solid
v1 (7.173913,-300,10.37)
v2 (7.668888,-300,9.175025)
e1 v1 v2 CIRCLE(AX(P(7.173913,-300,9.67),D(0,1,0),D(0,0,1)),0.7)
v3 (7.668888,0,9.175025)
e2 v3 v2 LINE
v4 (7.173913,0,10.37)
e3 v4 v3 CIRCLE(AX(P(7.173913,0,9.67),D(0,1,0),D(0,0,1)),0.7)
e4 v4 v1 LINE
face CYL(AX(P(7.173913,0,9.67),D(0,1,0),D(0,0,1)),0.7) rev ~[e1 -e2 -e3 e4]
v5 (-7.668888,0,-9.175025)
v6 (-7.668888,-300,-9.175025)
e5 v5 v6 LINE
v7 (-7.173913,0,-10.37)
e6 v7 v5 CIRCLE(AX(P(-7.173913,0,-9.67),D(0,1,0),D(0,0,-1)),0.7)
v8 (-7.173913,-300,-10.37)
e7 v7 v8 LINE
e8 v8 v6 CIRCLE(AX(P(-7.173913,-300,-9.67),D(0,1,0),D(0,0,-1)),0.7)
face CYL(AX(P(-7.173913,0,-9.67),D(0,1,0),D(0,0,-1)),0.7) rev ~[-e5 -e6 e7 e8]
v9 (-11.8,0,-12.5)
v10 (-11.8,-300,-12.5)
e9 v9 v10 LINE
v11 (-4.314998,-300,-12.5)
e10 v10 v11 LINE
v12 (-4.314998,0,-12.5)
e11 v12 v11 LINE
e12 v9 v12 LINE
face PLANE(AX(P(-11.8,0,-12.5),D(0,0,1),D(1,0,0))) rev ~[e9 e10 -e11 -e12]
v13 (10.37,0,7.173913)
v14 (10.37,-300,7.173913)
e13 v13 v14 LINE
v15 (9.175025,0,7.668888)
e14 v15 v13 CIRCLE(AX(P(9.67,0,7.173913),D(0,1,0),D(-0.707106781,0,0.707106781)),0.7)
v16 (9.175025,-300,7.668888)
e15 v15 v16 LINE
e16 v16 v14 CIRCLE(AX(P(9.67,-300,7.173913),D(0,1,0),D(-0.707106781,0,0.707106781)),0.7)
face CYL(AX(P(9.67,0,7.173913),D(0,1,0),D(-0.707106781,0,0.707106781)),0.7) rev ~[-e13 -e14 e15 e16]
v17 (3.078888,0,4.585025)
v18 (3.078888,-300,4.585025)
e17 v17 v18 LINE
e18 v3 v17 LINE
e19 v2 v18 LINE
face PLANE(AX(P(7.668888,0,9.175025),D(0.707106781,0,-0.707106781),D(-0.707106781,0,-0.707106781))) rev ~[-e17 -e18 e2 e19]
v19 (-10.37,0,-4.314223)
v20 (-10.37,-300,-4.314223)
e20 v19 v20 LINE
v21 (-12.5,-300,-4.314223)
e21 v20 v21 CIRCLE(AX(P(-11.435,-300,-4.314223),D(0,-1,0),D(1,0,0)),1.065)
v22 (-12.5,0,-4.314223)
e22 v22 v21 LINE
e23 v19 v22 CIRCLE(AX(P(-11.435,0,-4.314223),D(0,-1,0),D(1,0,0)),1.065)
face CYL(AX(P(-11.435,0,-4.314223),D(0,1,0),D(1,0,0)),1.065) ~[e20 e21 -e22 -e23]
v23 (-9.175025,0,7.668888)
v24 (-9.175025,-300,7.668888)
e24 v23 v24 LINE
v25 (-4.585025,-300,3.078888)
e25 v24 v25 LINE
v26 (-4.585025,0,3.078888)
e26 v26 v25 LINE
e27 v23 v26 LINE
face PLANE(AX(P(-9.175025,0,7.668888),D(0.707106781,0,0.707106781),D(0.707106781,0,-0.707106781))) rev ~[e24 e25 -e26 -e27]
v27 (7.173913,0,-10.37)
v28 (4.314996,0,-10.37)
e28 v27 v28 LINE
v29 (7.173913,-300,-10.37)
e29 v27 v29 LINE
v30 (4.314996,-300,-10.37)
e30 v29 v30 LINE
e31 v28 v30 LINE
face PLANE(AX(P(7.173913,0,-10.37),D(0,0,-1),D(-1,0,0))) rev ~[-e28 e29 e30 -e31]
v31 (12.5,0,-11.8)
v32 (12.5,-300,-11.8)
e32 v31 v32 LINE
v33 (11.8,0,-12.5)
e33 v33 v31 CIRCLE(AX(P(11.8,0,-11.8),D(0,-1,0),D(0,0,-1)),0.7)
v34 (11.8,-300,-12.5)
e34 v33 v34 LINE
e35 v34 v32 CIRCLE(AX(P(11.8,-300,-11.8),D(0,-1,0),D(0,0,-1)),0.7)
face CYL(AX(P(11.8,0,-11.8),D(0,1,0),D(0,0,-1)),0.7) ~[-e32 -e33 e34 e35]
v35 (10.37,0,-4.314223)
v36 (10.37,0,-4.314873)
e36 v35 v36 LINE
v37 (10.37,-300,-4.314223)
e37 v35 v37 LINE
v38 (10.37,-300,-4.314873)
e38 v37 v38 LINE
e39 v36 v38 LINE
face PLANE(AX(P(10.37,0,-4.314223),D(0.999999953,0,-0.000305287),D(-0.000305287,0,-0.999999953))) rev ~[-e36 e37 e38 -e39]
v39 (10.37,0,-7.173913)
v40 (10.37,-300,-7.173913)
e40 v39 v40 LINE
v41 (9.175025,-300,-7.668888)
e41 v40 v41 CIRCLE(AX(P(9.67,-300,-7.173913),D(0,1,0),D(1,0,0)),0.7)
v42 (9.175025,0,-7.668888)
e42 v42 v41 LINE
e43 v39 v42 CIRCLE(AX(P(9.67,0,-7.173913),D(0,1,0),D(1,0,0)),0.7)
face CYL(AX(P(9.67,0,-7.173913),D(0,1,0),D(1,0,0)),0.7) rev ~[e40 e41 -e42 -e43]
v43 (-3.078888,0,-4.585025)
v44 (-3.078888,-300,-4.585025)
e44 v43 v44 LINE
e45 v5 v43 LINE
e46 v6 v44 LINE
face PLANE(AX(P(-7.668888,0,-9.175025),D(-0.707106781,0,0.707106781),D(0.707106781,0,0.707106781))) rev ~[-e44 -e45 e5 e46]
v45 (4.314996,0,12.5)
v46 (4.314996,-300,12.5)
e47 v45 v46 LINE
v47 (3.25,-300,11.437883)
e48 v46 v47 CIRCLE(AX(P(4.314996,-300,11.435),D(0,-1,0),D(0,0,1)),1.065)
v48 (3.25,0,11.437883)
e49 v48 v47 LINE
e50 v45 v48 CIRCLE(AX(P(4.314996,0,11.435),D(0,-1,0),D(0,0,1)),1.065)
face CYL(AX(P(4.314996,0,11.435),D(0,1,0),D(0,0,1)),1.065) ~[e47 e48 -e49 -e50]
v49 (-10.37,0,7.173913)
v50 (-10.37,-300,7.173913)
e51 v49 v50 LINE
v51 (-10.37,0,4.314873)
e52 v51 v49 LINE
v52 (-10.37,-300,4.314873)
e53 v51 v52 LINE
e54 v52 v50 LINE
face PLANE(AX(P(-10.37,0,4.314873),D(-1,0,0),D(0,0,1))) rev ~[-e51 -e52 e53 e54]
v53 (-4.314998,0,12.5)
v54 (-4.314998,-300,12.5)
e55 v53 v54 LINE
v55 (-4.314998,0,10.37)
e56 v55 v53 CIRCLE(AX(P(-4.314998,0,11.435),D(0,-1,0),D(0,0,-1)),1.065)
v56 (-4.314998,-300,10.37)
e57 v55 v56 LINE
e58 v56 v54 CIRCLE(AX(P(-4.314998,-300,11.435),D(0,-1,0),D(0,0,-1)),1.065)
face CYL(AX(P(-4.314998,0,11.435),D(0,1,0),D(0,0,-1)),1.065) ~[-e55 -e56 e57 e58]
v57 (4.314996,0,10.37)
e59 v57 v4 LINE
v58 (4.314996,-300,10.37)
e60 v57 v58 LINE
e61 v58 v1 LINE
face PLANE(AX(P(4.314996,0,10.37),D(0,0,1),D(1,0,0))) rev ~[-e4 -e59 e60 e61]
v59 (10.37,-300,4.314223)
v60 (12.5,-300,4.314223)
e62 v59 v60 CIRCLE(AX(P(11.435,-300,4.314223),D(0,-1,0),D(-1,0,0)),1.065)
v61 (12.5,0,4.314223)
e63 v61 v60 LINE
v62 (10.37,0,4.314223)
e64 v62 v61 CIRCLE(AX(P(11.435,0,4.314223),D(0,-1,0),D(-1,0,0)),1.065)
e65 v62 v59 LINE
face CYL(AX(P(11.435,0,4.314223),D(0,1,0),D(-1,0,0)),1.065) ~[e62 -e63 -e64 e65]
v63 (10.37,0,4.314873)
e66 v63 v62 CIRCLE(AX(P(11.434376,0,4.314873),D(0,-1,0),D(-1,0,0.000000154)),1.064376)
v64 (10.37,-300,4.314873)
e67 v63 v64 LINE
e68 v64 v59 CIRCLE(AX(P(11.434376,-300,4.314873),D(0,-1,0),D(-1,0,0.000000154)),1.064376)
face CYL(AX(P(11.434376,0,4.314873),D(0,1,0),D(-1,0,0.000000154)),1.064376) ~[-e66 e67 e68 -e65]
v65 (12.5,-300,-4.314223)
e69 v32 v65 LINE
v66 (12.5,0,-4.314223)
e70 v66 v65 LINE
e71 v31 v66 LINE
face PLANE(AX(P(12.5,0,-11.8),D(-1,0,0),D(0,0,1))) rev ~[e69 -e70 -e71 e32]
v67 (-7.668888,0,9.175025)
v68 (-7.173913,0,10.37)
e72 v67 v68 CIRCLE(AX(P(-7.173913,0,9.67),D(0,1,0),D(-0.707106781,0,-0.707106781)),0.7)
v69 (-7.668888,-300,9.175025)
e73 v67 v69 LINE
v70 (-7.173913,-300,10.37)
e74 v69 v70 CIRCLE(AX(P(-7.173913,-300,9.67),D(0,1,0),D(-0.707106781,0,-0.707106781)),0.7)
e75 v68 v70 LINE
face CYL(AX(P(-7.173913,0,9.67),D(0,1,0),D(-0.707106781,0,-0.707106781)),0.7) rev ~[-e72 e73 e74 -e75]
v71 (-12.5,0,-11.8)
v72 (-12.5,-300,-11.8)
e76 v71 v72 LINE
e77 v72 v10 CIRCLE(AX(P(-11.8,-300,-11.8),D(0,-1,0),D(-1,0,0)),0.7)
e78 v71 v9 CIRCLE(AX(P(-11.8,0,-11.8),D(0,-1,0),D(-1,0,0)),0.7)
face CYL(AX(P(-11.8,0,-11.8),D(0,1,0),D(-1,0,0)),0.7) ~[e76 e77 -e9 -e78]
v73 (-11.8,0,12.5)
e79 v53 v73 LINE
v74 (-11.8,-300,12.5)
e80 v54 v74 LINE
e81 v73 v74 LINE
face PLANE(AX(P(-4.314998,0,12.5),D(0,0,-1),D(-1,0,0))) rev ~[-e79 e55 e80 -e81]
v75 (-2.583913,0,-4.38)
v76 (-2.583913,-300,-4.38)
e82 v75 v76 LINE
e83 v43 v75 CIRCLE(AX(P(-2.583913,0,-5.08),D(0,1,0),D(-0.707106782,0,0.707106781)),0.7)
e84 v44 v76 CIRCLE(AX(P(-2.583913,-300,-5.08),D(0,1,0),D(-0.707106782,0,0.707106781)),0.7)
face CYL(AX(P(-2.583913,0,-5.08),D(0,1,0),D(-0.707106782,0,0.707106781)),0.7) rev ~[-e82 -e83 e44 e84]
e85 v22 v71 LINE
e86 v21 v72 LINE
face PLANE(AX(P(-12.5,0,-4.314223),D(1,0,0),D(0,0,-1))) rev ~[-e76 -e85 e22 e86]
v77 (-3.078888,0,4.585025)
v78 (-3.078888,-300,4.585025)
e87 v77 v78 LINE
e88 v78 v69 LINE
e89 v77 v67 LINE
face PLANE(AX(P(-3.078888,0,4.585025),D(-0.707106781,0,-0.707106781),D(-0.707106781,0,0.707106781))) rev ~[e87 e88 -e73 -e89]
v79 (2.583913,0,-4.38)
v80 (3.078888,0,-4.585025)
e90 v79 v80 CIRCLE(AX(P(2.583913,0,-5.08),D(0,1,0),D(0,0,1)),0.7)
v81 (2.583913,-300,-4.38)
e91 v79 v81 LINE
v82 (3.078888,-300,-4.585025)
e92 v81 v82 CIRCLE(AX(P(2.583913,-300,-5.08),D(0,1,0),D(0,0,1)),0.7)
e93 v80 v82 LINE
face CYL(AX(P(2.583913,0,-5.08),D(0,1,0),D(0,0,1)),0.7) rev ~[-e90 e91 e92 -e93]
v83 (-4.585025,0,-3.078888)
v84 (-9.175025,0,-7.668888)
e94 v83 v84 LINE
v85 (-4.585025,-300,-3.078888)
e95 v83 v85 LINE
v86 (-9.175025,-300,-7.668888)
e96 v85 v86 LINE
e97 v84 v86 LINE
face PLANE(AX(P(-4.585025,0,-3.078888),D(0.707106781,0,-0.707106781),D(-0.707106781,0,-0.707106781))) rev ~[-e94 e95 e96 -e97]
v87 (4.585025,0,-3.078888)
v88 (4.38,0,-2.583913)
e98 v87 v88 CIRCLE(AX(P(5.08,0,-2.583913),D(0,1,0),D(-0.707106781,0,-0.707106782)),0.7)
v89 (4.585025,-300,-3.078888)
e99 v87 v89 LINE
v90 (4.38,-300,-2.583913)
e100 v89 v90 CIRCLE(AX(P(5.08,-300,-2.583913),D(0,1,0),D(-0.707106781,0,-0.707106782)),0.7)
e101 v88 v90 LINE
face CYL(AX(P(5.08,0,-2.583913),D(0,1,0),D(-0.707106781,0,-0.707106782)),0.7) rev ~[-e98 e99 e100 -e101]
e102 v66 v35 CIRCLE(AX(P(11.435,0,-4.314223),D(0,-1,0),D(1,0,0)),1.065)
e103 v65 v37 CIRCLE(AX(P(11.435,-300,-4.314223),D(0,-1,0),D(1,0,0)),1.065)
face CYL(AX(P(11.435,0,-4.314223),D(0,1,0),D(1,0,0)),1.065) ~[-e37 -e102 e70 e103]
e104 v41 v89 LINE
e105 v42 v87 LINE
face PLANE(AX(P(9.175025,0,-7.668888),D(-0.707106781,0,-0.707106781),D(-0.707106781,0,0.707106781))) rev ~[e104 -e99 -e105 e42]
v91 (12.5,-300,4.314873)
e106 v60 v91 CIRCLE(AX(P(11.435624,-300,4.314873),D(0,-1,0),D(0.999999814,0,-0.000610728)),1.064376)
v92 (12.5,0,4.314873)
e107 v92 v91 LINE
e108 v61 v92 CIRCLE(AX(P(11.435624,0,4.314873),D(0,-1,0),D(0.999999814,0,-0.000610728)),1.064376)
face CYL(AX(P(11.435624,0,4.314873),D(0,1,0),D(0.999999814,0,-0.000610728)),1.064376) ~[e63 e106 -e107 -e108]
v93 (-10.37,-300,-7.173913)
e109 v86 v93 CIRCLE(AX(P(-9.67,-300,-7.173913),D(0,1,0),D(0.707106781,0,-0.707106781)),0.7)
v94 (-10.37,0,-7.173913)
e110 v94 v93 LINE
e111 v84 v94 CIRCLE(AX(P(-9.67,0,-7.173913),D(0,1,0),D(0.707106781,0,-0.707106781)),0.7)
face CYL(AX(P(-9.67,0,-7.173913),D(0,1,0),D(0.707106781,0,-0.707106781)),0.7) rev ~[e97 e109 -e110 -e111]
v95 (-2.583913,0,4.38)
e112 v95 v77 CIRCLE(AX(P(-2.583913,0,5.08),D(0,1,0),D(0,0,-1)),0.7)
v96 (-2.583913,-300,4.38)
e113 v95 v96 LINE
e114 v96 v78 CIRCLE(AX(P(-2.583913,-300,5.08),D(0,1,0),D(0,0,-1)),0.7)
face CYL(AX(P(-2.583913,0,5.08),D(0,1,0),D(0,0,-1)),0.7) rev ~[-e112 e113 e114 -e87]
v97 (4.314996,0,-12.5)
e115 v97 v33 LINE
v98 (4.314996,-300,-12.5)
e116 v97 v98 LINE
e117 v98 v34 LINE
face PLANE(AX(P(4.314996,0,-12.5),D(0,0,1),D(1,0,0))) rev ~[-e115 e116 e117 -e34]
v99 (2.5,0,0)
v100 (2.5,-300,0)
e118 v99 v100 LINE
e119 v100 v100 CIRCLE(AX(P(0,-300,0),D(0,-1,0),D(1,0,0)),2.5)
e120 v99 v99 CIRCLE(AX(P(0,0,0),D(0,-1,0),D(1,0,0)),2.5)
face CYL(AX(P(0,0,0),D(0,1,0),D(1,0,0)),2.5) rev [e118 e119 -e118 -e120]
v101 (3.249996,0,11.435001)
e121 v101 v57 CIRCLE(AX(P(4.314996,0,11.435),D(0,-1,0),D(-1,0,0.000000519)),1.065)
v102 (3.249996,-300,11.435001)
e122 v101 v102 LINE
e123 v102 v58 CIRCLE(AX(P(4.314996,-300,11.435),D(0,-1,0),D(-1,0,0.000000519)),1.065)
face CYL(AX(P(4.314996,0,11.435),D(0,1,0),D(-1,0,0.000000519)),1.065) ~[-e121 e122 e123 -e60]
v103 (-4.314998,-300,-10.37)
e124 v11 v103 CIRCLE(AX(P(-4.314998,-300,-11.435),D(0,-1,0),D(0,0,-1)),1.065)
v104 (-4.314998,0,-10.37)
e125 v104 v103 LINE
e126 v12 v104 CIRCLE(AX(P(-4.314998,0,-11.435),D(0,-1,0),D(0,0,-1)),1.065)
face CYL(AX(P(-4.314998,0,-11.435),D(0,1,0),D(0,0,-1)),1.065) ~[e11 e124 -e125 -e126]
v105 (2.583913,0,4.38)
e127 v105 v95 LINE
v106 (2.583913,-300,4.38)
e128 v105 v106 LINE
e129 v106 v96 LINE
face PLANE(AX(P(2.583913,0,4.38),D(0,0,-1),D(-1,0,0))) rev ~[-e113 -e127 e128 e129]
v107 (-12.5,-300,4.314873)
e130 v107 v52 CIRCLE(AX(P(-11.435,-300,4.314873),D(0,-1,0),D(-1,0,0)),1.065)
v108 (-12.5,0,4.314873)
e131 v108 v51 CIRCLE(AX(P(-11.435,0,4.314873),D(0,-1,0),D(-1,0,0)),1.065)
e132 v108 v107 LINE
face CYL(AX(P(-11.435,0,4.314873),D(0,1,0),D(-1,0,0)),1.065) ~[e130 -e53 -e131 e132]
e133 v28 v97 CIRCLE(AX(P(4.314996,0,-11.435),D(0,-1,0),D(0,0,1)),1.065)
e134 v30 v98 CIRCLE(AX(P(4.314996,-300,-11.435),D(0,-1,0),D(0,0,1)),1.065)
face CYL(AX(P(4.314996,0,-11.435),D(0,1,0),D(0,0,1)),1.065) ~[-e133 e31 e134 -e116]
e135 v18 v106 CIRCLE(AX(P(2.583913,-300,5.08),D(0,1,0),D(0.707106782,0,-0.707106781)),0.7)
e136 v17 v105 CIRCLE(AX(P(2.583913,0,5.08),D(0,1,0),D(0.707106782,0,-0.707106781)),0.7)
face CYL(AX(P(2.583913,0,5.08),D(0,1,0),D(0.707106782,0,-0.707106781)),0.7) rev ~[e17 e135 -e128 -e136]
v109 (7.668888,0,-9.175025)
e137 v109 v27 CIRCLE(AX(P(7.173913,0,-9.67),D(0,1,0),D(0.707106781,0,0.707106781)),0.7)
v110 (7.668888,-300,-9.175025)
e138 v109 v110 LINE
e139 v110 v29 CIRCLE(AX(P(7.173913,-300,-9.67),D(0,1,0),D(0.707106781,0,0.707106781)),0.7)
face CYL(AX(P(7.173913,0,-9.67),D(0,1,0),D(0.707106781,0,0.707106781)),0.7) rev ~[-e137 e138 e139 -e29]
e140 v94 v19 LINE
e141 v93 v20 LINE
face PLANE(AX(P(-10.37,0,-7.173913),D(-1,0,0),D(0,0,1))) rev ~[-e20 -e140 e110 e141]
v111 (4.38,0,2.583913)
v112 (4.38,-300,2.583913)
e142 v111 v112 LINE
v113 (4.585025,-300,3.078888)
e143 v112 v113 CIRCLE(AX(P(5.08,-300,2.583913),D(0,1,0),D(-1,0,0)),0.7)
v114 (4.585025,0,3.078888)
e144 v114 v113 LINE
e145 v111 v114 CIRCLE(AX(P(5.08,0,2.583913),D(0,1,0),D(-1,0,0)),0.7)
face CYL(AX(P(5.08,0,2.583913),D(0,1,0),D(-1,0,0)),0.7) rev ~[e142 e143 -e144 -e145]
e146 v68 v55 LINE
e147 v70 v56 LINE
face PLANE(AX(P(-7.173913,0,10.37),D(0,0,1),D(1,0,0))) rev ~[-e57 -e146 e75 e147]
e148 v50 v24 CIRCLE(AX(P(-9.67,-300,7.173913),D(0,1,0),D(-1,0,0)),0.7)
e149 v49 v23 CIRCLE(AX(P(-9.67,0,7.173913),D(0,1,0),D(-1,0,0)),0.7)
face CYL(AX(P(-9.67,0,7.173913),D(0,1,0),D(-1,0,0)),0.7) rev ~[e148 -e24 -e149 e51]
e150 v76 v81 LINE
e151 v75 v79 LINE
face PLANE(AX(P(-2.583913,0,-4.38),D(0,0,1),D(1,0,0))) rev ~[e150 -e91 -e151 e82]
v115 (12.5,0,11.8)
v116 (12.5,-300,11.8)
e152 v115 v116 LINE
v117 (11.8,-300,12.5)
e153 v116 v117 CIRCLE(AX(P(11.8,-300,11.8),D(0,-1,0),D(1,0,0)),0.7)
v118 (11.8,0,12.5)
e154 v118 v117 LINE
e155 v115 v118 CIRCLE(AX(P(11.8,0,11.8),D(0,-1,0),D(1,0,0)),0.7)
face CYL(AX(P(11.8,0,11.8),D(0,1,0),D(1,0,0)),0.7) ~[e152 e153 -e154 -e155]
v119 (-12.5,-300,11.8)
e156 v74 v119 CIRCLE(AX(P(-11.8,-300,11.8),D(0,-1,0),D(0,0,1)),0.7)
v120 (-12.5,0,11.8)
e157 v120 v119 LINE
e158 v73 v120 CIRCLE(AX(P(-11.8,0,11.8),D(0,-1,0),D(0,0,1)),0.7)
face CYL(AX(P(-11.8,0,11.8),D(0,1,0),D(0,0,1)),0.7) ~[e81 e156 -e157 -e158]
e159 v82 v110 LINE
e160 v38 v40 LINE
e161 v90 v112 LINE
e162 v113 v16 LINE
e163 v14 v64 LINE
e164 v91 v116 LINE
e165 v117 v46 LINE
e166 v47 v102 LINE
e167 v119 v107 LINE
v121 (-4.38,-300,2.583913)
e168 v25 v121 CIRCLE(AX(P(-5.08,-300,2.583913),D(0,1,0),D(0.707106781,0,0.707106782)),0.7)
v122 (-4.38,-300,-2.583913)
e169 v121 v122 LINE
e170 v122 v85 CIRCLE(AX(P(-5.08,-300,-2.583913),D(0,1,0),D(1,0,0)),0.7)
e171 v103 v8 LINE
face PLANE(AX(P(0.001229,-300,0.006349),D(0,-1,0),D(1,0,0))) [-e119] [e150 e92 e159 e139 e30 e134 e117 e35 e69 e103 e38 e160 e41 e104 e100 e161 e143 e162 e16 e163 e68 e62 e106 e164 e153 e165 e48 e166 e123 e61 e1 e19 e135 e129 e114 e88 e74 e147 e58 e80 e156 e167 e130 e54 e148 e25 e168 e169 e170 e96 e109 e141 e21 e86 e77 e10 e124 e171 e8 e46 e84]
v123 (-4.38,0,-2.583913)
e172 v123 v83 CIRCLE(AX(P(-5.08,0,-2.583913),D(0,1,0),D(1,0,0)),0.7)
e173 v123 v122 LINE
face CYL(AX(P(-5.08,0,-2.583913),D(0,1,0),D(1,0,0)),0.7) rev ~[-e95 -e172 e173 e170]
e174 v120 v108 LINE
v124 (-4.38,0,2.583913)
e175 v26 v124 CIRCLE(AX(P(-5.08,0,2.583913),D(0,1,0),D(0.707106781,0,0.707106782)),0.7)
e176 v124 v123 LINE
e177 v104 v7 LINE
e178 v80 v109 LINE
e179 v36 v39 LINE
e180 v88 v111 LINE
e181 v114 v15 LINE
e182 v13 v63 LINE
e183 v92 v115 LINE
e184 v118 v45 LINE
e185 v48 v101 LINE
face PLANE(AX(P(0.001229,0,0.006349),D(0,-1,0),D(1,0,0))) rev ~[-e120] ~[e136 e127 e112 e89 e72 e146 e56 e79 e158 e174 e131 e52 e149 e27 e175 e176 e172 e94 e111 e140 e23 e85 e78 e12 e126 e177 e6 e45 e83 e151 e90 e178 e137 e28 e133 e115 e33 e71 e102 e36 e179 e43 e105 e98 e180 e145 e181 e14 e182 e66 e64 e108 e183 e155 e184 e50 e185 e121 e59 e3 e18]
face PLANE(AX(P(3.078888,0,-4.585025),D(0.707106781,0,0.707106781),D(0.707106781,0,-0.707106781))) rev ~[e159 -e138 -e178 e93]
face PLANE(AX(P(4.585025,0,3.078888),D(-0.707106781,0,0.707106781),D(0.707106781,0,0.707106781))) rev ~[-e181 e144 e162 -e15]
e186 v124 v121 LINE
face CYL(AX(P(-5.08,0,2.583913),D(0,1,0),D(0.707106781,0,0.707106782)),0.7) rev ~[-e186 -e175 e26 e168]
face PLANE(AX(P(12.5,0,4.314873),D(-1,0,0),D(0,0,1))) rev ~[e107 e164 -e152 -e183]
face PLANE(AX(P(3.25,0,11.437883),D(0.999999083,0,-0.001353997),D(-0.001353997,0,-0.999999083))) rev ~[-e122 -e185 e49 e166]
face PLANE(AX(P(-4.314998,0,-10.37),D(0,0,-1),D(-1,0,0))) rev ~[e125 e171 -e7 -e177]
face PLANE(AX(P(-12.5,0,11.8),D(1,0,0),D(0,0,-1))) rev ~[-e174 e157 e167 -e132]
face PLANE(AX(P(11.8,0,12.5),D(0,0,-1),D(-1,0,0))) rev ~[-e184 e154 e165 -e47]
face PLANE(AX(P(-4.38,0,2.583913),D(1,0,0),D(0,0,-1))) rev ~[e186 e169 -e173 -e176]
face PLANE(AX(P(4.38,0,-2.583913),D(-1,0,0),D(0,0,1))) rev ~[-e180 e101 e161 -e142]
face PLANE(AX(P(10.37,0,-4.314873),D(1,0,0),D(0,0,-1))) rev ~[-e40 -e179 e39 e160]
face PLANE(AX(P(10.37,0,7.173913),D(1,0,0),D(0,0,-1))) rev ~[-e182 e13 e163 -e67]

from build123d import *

# Parameters (mm, degrees)
F0_R     = 2.5
F1_DEPTH = 300


# Not quite as in the source:
# - ends of sketch curves that miss each other by under 0.0002 mm in the source are joined


with BuildPart() as f1:
    # F0 (on Front) → F1 (new body)
    with BuildSketch(Plane.XZ):
        with BuildLine():
            ThreePointArc((12.5, 11.8), (12.2949747468, 12.2949747468), (11.8, 12.5))
            Line((11.8, 12.5), (4.3149960966, 12.5))
            ThreePointArc((4.3149960966, 12.5), (3.5629475094, 12.1890874766), (3.25, 11.4378834224))
            Line((3.25, 11.4378834224), (3.2499960966, 11.4350005532))
            ThreePointArc((3.2499960966, 11.4350005532), (3.5619271791, 10.6819314736), (4.3149960966, 10.37))
            Line((4.3149960966, 10.37), (7.1739130624, 10.37))
            ThreePointArc((7.1739130624, 10.37), (7.8206287352, 9.9378784027), (7.6688878092, 9.1750252532))
            Line((7.6688878092, 9.1750252532), (3.0788878092, 4.5850252532))
            ThreePointArc((3.0788878092, 4.5850252532), (2.8517914651, 4.4332843272), (2.5839130624, 4.38))
            Line((2.5839130624, 4.38), (-2.5839130624, 4.38))
            ThreePointArc((-2.5839130624, 4.38), (-2.8517914651, 4.4332843272), (-3.0788878092, 4.5850252532))
            Line((-3.0788878092, 4.5850252532), (-7.6688878092, 9.1750252532))
            ThreePointArc((-7.6688878092, 9.1750252532), (-7.8206287352, 9.9378784027), (-7.1739130624, 10.37))
            Line((-7.1739130624, 10.37), (-4.3149983424, 10.37))
            ThreePointArc((-4.3149983424, 10.37), (-3.2499983424, 11.435), (-4.3149983424, 12.5))
            Line((-4.3149983424, 12.5), (-11.8, 12.5))
            ThreePointArc((-11.8, 12.5), (-12.2949747468, 12.2949747468), (-12.5, 11.8))
            Line((-12.5, 11.8), (-12.5, 4.3148727296))
            ThreePointArc((-12.5, 4.3148727296), (-11.435, 3.2498727296), (-10.37, 4.3148727296))
            Line((-10.37, 4.3148727296), (-10.37, 7.1739130624))
            ThreePointArc((-10.37, 7.1739130624), (-9.9378784027, 7.8206287352), (-9.1750252532, 7.6688878092))
            Line((-9.1750252532, 7.6688878092), (-4.5850252532, 3.0788878092))
            ThreePointArc((-4.5850252532, 3.0788878092), (-4.4332843272, 2.8517914651), (-4.38, 2.5839130624))
            Line((-4.38, 2.5839130624), (-4.38, -2.5839130624))
            ThreePointArc((-4.38, -2.5839130624), (-4.4332843272, -2.8517914651), (-4.5850252532, -3.0788878092))
            Line((-4.5850252532, -3.0788878092), (-9.1750252532, -7.6688878092))
            ThreePointArc((-9.1750252532, -7.6688878092), (-9.9378784027, -7.8206287352), (-10.37, -7.1739130624))
            Line((-10.37, -7.1739130624), (-10.37, -4.3142225218))
            ThreePointArc((-10.37, -4.3142225218), (-11.435, -3.2492225218), (-12.5, -4.3142225218))
            Line((-12.5, -4.3142225218), (-12.5, -11.8))
            ThreePointArc((-12.5, -11.8), (-12.2949747468, -12.2949747468), (-11.8, -12.5))
            Line((-11.8, -12.5), (-4.3149983424, -12.5))
            ThreePointArc((-4.3149983424, -12.5), (-3.2499983424, -11.435), (-4.3149983424, -10.37))
            Line((-4.3149983424, -10.37), (-7.1739130624, -10.37))
            ThreePointArc((-7.1739130624, -10.37), (-7.8206287352, -9.9378784027), (-7.6688878092, -9.1750252532))
            Line((-7.6688878092, -9.1750252532), (-3.0788878092, -4.5850252532))
            ThreePointArc((-3.0788878092, -4.5850252532), (-2.8517914651, -4.4332843272), (-2.5839130624, -4.38))
            Line((-2.5839130624, -4.38), (2.5839130624, -4.38))
            ThreePointArc((2.5839130624, -4.38), (2.8517914651, -4.4332843272), (3.0788878092, -4.5850252532))
            Line((3.0788878092, -4.5850252532), (7.6688878092, -9.1750252532))
            ThreePointArc((7.6688878092, -9.1750252532), (7.8206287352, -9.9378784027), (7.1739130624, -10.37))
            Line((7.1739130624, -10.37), (4.3149960966, -10.37))
            ThreePointArc((4.3149960966, -10.37), (3.2499960966, -11.435), (4.3149960966, -12.5))
            Line((4.3149960966, -12.5), (11.8, -12.5))
            ThreePointArc((11.8, -12.5), (12.2949747468, -12.2949747468), (12.5, -11.8))
            Line((12.5, -11.8), (12.5, -4.3148727296))
            Line((12.5, -4.3148727296), (12.5, -4.3142225218))
            ThreePointArc((12.5, -4.3142225218), (11.435, -3.2498727296), (10.3700001985, -4.314222522))
            Line((10.3700001985, -4.314222522), (10.37, -4.3148727296))
            Line((10.37, -4.3148727296), (10.37, -7.1739130624))
            ThreePointArc((10.37, -7.1739130624), (9.9378784027, -7.8206287352), (9.1750252532, -7.6688878092))
            Line((9.1750252532, -7.6688878092), (4.5850252532, -3.0788878092))
            ThreePointArc((4.5850252532, -3.0788878092), (4.4332843272, -2.8517914651), (4.38, -2.5839130624))
            Line((4.38, -2.5839130624), (4.38, 2.5839130624))
            ThreePointArc((4.38, 2.5839130624), (4.4332843272, 2.8517914651), (4.5850252532, 3.0788878092))
            Line((4.5850252532, 3.0788878092), (9.1750252532, 7.6688878092))
            ThreePointArc((9.1750252532, 7.6688878092), (9.9378784027, 7.8206287352), (10.37, 7.1739130624))
            Line((10.37, 7.1739130624), (10.37, 4.3148727296))
            ThreePointArc((10.37, 4.3148727296), (10.3700000496, 4.3145476258), (10.3700001985, 4.314222522))
            ThreePointArc((10.3700001985, 4.314222522), (11.435, 3.2498727296), (12.4999998015, 4.314222522))
            ThreePointArc((12.4999998015, 4.314222522), (12.4999999504, 4.3145476258), (12.5, 4.3148727296))
            Line((12.5, 4.3148727296), (12.5, 11.8))
        make_face()
        Circle(F0_R, mode=Mode.SUBTRACT)
        with BuildLine():
            ThreePointArc((10.37, 4.3142225218), (11.435, 3.2492225218), (12.5, 4.3142225218))
            ThreePointArc((12.5, 4.3142225218), (11.435, 3.2498727296), (10.37, 4.3142225218))
        make_face()
        with BuildLine():
            ThreePointArc((12.5, -4.3142225218), (11.435, -3.2492225218), (10.37, -4.3142225218))
            ThreePointArc((10.37, -4.3142225218), (11.435, -3.2498727296), (12.5, -4.3142225218))
        make_face()
    extrude(amount=F1_DEPTH)


solid = f1.part
